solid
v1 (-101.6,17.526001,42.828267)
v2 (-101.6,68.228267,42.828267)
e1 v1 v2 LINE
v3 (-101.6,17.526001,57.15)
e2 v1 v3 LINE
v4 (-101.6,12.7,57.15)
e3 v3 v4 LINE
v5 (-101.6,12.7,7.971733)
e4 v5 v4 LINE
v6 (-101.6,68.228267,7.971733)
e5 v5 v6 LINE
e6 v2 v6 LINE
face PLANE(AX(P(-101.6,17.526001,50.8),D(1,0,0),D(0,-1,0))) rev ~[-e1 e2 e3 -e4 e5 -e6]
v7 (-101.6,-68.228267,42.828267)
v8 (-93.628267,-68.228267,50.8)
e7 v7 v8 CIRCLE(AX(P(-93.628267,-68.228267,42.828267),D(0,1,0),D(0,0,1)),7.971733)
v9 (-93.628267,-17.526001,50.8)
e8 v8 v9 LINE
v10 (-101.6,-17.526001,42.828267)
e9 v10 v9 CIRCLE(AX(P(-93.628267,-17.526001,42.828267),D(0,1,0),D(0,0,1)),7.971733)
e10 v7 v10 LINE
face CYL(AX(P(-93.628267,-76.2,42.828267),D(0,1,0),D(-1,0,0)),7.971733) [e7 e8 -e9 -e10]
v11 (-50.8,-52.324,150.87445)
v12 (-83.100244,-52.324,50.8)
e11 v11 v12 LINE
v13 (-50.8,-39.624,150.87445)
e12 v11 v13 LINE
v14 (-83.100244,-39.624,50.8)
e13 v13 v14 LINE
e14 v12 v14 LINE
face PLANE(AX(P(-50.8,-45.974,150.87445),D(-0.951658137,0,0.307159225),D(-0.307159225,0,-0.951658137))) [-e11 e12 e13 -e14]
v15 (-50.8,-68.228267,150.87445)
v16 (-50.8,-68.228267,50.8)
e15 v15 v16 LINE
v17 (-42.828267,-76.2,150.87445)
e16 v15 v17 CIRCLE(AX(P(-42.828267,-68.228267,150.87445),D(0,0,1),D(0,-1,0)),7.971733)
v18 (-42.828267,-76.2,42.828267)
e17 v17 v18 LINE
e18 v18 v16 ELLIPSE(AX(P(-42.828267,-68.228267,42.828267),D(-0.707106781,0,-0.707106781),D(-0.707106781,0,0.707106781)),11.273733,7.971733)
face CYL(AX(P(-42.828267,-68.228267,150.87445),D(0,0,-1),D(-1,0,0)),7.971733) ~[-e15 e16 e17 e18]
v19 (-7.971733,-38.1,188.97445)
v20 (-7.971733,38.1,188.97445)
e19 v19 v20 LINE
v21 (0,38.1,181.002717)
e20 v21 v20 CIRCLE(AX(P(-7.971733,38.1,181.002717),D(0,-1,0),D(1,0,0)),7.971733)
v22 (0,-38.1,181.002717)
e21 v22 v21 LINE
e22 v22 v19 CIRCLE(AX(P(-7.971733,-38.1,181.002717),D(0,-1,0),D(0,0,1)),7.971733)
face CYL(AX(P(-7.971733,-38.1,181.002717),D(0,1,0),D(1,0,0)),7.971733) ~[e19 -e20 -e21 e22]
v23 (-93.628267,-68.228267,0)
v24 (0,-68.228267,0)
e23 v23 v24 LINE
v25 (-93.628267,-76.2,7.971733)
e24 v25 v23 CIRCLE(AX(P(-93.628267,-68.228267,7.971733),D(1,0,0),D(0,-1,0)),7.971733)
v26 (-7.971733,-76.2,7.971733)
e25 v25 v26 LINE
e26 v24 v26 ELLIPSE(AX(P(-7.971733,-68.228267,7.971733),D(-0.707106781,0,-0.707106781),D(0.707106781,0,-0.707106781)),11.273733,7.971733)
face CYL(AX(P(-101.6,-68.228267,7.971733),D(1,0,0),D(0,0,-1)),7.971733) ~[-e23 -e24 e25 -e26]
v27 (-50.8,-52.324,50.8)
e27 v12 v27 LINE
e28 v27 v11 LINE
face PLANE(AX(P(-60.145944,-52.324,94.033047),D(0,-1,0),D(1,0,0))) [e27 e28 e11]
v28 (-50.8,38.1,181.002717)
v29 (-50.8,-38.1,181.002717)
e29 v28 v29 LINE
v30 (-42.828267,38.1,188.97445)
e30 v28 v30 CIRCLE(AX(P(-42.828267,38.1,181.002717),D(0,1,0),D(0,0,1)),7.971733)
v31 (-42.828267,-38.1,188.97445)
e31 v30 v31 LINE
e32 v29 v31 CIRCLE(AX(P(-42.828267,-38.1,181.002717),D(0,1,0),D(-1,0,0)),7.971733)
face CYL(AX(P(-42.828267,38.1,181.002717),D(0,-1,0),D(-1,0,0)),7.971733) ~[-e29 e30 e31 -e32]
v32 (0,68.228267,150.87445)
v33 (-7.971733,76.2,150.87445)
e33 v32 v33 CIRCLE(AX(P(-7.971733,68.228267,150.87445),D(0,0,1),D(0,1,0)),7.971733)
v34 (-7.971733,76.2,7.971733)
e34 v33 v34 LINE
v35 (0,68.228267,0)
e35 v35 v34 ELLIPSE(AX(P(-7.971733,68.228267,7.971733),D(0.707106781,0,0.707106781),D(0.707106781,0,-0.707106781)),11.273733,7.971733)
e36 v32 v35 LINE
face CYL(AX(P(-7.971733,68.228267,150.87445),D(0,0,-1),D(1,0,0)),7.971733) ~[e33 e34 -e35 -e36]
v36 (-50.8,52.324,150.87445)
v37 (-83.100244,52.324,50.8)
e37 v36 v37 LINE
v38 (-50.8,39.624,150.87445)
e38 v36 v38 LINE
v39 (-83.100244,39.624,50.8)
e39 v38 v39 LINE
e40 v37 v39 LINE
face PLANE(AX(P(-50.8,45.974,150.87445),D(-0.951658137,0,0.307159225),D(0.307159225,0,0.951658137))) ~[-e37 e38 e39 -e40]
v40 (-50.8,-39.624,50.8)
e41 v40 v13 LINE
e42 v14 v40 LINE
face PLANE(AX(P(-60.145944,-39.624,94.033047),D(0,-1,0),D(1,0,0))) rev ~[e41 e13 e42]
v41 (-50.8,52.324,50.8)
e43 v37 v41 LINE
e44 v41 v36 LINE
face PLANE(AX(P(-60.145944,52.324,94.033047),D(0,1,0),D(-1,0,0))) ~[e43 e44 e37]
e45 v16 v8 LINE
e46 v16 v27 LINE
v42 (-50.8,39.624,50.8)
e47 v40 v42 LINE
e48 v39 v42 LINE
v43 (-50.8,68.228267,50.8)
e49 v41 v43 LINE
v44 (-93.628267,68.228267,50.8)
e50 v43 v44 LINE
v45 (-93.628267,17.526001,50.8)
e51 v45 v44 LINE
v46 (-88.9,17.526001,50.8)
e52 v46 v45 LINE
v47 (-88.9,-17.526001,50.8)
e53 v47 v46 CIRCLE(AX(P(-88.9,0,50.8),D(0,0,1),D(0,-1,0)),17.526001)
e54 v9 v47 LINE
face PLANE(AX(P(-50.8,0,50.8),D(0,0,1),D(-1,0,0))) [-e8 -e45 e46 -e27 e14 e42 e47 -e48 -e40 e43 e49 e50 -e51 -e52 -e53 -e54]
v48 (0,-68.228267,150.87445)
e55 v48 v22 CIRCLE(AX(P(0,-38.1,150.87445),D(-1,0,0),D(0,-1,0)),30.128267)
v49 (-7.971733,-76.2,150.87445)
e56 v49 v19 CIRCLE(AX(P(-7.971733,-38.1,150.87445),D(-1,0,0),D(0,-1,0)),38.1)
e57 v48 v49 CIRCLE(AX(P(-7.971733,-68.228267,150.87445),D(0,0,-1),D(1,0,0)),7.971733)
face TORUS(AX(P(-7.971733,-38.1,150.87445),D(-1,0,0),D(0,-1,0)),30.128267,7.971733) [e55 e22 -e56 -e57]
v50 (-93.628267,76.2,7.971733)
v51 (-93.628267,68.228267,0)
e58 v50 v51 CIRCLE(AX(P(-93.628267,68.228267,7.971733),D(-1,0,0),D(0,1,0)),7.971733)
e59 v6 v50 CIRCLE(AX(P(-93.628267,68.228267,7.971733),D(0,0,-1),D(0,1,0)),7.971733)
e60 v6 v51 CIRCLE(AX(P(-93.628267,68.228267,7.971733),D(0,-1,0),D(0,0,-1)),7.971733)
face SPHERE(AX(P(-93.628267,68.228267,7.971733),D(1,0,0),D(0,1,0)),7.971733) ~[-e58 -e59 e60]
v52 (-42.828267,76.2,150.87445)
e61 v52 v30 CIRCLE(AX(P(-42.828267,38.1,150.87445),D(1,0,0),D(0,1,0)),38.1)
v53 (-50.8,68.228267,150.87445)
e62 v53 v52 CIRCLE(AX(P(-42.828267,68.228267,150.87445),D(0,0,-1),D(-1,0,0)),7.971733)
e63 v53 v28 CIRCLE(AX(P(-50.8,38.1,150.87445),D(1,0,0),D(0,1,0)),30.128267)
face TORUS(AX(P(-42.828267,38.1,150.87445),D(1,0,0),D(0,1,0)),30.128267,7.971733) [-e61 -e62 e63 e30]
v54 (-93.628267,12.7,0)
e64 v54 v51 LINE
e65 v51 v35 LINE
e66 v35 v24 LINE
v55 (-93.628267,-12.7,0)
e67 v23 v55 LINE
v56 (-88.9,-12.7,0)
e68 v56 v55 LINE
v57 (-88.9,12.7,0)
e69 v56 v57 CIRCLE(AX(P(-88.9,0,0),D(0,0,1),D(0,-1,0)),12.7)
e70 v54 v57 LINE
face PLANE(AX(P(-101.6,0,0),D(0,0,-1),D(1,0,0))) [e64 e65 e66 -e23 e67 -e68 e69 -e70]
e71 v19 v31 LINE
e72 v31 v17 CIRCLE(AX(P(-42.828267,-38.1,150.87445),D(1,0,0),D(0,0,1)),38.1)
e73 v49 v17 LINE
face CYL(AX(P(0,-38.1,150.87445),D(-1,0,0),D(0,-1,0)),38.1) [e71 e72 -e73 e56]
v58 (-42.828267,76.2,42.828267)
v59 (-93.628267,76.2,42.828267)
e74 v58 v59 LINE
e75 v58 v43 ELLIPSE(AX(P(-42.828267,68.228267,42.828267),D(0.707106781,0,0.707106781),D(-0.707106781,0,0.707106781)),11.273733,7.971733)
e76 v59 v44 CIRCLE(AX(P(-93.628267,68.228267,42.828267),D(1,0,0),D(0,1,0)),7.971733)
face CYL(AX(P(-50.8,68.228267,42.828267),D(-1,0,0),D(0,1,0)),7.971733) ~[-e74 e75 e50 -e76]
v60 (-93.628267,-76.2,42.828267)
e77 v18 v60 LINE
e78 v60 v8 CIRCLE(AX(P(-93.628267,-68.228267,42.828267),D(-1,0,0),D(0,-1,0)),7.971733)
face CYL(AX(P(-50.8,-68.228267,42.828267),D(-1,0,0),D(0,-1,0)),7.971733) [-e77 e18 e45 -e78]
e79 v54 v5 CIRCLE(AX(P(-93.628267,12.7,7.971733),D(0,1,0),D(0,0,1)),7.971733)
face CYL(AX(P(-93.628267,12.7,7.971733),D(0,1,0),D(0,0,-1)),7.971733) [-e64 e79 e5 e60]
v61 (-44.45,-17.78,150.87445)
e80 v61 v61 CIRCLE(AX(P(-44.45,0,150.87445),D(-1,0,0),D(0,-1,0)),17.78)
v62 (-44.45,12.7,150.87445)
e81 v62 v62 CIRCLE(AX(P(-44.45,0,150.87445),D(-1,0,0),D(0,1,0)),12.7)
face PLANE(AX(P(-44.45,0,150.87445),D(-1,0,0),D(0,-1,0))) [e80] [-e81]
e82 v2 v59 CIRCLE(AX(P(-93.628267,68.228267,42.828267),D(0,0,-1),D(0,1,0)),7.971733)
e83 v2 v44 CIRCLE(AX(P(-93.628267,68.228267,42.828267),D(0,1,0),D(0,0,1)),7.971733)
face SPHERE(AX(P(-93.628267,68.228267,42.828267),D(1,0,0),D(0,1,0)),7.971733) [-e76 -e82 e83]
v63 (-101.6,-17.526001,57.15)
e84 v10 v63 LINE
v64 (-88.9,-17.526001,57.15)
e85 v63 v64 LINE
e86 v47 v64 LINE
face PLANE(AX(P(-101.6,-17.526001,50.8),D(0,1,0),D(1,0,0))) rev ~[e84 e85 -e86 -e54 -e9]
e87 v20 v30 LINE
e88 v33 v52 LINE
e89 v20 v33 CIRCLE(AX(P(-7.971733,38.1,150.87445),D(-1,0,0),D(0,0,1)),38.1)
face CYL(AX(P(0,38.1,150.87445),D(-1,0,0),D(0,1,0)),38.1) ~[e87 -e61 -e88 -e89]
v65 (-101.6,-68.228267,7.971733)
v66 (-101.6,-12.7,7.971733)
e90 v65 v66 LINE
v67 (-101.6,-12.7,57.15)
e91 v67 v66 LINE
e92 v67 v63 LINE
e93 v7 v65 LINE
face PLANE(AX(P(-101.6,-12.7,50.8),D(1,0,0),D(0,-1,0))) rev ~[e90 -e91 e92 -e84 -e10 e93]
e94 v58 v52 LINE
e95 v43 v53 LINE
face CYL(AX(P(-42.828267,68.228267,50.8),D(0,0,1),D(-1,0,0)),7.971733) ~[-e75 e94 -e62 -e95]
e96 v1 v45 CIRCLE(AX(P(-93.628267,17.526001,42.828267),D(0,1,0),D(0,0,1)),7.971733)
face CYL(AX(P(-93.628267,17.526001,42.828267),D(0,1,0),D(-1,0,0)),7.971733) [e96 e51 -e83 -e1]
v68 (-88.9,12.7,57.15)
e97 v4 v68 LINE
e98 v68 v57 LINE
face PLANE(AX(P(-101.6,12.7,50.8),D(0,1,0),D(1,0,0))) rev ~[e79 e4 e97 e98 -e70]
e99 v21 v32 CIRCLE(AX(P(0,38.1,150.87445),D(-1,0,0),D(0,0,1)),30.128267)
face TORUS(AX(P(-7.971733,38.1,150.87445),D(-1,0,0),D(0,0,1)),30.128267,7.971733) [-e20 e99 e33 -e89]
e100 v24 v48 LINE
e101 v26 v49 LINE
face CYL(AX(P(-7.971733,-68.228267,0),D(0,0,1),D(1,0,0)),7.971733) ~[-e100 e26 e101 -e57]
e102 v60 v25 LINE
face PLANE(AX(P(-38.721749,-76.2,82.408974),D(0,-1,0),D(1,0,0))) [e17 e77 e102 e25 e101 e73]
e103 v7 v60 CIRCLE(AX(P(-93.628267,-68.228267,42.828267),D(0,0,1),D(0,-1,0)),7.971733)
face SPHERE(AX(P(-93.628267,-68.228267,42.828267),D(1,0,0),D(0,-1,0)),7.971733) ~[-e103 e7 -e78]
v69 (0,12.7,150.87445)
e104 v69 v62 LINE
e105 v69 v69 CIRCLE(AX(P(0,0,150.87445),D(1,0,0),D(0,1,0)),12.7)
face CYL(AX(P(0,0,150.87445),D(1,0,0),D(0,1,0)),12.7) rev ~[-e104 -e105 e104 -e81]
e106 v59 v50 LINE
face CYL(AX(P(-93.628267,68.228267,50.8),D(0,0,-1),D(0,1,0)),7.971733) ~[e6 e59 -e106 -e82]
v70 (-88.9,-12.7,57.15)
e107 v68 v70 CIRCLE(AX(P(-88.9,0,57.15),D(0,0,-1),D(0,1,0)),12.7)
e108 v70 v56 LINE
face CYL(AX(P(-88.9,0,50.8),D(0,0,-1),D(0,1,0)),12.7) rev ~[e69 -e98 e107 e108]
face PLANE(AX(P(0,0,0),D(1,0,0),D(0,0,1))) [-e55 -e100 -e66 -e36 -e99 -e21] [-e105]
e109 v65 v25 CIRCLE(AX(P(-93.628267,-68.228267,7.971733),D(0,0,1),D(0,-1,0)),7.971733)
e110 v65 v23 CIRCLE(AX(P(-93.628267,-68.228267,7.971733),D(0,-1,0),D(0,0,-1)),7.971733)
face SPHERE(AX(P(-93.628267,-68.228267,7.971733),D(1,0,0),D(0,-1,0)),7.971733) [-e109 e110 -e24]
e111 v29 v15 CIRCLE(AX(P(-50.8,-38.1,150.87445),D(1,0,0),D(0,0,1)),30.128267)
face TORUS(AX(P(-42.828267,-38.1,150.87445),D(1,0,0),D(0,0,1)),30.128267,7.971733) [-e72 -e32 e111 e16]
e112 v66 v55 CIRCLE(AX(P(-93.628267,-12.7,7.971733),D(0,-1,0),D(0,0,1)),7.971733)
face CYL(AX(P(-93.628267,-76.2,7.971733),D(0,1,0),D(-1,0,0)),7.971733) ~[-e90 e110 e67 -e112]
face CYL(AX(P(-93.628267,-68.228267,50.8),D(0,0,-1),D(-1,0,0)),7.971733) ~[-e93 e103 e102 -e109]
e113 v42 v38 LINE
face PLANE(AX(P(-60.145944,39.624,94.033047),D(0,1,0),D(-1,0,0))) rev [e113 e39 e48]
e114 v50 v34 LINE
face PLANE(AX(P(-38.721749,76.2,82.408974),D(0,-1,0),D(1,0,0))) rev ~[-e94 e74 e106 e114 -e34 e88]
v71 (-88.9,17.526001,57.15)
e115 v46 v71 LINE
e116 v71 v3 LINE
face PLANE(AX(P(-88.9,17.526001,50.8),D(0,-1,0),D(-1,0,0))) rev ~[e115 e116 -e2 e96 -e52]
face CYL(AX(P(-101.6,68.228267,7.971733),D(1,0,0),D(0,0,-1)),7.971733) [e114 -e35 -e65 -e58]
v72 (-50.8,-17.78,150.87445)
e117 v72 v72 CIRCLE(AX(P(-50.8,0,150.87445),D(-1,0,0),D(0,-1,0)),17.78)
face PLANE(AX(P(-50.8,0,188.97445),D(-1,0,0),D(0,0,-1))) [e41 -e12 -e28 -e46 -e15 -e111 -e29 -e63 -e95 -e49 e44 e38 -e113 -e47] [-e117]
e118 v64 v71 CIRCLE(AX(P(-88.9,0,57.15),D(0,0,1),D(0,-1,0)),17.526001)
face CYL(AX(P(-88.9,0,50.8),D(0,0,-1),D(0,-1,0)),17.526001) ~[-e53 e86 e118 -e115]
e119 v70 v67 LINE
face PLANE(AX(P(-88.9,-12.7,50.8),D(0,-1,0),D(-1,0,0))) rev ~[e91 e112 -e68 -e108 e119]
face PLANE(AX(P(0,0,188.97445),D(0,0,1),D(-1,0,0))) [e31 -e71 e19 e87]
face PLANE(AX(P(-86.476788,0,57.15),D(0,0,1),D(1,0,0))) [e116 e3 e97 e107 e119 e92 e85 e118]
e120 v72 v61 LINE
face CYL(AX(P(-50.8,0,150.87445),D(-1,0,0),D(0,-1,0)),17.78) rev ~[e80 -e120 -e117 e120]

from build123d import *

# Parameters (mm, degrees)
F1_DEPTH  = 76.2
F2_R      = 12.7
F3_DEPTH  = 101.601
F5_DEPTH  = 50.801
F6_R      = 38.1
F7_R      = 17.78
F7_R_2    = 12.7
F8_DEPTH  = 6.35
F12_DEPTH = 6.35
F15_DEPTH = 6.35
F16_R     = 7.971733183


# Not quite as in the source:
# - a pattern or mirror of a feature is missing from the dataset's text; its kind, count and spacing are read off the source's solid


with BuildPart() as f1:
    # F0 (on Front) → F1 (new body, symmetric)
    with BuildSketch(Plane.XZ):
        Polygon((-101.6, 0), (0, 0), (0, 188.9744497656), (-50.8, 188.9744497656), (-50.8, 50.8), (-101.6, 50.8), align=None)
    extrude(amount=F1_DEPTH, both=True)

    # F2 (on face) → F3 (cut, through all)
    with BuildSketch(Plane.YZ):
        with Locations((0, 150.8744497656)):
            Circle(F2_R)
    extrude(amount=-F3_DEPTH, mode=Mode.SUBTRACT)

    # F4 (on face) → F5 (cut, through all)
    with BuildSketch(Plane.XY.offset(50.8)):
        with BuildLine():
            Line((-88.9, 12.7), (-101.6, 12.7))
            Line((-101.6, 12.7), (-101.6, -12.7))
            Line((-101.6, -12.7), (-88.9, -12.7))
            ThreePointArc((-88.9, -12.7), (-76.2, 0), (-88.9, 12.7))
        make_face()
    extrude(amount=-F5_DEPTH, mode=Mode.SUBTRACT)

    # F6
    f6_edges = [f1.edges().sort_by_distance(p)[0] for p in [
        (-25.4, -76.2, 188.97445),
        (-25.4, 76.2, 188.97445),
    ]]
    fillet(f6_edges, radius=F6_R)

    # F7 (on face) → F8 (cut)
    with BuildSketch(Plane(origin=(-50.8, 0, 0), x_dir=(0, -1, 0), z_dir=(-1, 0, 0))):
        with Locations((0, 150.8744497656)):
            Circle(F7_R)
        with Locations((0, 150.8744497656)):
            Circle(F7_R_2, mode=Mode.SUBTRACT)
    extrude(amount=-F8_DEPTH, mode=Mode.SUBTRACT)

    # F11 (on offset) → F12 (join, symmetric)
    with BuildSketch(Plane.XZ.offset(45.974)):
        Polygon((-83.1002444029, 50.8), (-50.8, 50.8), (-50.8, 150.8744497656), align=None)
    f12 = extrude(amount=F12_DEPTH, both=True)

    # F12_copies: F12 across plane
    add(f12.mirror(Plane.ZX))

    # F14 (on face) → F15 (join)
    with BuildSketch(Plane.XY.offset(50.8)):
        with BuildLine():
            Line((-101.6, -12.7), (-101.6, -17.5260007381))
            Line((-101.6, -17.5260007381), (-88.9, -17.5260007381))
            ThreePointArc((-88.9, -17.5260007381), (-71.3739992619, 0), (-88.9, 17.5260007381))
            Line((-88.9, 17.5260007381), (-101.6, 17.5260007381))
            Line((-101.6, 17.5260007381), (-101.6, 12.7))
            Line((-101.6, 12.7), (-88.9, 12.7))
            ThreePointArc((-88.9, 12.7), (-76.2, 0), (-88.9, -12.7))
            Line((-88.9, -12.7), (-101.6, -12.7))
        make_face()
    extrude(amount=F15_DEPTH)

    # F16
    f16_edges = [f1.edges().sort_by_distance(p)[0] for p in [
        (-76.2, -76.2, 50.8),
        (-76.2, 76.2, 50.8),
        (-50.8, -76.2, 0),
        (0, -76.2, 75.437225),
        (-25.4, -76.2, 150.87445),
        (-50.8, -76.2, 100.837225),
        (-101.6, -76.2, 25.4),
        (-50.8, 76.2, 0),
        (-101.6, 76.2, 25.4),
        (-101.6, 46.863, 50.8),
        (-101.6, -46.863, 50.8),
        (-101.6, -44.45, 0),
        (-101.6, 44.45, 0),
        (0, 76.2, 75.437225),
        (-50.8, 76.2, 100.837225),
        (0, 65.040768, 177.815218),
        (-50.8, 65.040768, 177.815218),
        (0, 0, 188.97445),
        (-50.8, 0, 188.97445),
        (-50.8, -65.040768, 177.815218),
        (0, -65.040768, 177.815218),
    ]]
    fillet(f16_edges, radius=F16_R)


solid = f1.part
